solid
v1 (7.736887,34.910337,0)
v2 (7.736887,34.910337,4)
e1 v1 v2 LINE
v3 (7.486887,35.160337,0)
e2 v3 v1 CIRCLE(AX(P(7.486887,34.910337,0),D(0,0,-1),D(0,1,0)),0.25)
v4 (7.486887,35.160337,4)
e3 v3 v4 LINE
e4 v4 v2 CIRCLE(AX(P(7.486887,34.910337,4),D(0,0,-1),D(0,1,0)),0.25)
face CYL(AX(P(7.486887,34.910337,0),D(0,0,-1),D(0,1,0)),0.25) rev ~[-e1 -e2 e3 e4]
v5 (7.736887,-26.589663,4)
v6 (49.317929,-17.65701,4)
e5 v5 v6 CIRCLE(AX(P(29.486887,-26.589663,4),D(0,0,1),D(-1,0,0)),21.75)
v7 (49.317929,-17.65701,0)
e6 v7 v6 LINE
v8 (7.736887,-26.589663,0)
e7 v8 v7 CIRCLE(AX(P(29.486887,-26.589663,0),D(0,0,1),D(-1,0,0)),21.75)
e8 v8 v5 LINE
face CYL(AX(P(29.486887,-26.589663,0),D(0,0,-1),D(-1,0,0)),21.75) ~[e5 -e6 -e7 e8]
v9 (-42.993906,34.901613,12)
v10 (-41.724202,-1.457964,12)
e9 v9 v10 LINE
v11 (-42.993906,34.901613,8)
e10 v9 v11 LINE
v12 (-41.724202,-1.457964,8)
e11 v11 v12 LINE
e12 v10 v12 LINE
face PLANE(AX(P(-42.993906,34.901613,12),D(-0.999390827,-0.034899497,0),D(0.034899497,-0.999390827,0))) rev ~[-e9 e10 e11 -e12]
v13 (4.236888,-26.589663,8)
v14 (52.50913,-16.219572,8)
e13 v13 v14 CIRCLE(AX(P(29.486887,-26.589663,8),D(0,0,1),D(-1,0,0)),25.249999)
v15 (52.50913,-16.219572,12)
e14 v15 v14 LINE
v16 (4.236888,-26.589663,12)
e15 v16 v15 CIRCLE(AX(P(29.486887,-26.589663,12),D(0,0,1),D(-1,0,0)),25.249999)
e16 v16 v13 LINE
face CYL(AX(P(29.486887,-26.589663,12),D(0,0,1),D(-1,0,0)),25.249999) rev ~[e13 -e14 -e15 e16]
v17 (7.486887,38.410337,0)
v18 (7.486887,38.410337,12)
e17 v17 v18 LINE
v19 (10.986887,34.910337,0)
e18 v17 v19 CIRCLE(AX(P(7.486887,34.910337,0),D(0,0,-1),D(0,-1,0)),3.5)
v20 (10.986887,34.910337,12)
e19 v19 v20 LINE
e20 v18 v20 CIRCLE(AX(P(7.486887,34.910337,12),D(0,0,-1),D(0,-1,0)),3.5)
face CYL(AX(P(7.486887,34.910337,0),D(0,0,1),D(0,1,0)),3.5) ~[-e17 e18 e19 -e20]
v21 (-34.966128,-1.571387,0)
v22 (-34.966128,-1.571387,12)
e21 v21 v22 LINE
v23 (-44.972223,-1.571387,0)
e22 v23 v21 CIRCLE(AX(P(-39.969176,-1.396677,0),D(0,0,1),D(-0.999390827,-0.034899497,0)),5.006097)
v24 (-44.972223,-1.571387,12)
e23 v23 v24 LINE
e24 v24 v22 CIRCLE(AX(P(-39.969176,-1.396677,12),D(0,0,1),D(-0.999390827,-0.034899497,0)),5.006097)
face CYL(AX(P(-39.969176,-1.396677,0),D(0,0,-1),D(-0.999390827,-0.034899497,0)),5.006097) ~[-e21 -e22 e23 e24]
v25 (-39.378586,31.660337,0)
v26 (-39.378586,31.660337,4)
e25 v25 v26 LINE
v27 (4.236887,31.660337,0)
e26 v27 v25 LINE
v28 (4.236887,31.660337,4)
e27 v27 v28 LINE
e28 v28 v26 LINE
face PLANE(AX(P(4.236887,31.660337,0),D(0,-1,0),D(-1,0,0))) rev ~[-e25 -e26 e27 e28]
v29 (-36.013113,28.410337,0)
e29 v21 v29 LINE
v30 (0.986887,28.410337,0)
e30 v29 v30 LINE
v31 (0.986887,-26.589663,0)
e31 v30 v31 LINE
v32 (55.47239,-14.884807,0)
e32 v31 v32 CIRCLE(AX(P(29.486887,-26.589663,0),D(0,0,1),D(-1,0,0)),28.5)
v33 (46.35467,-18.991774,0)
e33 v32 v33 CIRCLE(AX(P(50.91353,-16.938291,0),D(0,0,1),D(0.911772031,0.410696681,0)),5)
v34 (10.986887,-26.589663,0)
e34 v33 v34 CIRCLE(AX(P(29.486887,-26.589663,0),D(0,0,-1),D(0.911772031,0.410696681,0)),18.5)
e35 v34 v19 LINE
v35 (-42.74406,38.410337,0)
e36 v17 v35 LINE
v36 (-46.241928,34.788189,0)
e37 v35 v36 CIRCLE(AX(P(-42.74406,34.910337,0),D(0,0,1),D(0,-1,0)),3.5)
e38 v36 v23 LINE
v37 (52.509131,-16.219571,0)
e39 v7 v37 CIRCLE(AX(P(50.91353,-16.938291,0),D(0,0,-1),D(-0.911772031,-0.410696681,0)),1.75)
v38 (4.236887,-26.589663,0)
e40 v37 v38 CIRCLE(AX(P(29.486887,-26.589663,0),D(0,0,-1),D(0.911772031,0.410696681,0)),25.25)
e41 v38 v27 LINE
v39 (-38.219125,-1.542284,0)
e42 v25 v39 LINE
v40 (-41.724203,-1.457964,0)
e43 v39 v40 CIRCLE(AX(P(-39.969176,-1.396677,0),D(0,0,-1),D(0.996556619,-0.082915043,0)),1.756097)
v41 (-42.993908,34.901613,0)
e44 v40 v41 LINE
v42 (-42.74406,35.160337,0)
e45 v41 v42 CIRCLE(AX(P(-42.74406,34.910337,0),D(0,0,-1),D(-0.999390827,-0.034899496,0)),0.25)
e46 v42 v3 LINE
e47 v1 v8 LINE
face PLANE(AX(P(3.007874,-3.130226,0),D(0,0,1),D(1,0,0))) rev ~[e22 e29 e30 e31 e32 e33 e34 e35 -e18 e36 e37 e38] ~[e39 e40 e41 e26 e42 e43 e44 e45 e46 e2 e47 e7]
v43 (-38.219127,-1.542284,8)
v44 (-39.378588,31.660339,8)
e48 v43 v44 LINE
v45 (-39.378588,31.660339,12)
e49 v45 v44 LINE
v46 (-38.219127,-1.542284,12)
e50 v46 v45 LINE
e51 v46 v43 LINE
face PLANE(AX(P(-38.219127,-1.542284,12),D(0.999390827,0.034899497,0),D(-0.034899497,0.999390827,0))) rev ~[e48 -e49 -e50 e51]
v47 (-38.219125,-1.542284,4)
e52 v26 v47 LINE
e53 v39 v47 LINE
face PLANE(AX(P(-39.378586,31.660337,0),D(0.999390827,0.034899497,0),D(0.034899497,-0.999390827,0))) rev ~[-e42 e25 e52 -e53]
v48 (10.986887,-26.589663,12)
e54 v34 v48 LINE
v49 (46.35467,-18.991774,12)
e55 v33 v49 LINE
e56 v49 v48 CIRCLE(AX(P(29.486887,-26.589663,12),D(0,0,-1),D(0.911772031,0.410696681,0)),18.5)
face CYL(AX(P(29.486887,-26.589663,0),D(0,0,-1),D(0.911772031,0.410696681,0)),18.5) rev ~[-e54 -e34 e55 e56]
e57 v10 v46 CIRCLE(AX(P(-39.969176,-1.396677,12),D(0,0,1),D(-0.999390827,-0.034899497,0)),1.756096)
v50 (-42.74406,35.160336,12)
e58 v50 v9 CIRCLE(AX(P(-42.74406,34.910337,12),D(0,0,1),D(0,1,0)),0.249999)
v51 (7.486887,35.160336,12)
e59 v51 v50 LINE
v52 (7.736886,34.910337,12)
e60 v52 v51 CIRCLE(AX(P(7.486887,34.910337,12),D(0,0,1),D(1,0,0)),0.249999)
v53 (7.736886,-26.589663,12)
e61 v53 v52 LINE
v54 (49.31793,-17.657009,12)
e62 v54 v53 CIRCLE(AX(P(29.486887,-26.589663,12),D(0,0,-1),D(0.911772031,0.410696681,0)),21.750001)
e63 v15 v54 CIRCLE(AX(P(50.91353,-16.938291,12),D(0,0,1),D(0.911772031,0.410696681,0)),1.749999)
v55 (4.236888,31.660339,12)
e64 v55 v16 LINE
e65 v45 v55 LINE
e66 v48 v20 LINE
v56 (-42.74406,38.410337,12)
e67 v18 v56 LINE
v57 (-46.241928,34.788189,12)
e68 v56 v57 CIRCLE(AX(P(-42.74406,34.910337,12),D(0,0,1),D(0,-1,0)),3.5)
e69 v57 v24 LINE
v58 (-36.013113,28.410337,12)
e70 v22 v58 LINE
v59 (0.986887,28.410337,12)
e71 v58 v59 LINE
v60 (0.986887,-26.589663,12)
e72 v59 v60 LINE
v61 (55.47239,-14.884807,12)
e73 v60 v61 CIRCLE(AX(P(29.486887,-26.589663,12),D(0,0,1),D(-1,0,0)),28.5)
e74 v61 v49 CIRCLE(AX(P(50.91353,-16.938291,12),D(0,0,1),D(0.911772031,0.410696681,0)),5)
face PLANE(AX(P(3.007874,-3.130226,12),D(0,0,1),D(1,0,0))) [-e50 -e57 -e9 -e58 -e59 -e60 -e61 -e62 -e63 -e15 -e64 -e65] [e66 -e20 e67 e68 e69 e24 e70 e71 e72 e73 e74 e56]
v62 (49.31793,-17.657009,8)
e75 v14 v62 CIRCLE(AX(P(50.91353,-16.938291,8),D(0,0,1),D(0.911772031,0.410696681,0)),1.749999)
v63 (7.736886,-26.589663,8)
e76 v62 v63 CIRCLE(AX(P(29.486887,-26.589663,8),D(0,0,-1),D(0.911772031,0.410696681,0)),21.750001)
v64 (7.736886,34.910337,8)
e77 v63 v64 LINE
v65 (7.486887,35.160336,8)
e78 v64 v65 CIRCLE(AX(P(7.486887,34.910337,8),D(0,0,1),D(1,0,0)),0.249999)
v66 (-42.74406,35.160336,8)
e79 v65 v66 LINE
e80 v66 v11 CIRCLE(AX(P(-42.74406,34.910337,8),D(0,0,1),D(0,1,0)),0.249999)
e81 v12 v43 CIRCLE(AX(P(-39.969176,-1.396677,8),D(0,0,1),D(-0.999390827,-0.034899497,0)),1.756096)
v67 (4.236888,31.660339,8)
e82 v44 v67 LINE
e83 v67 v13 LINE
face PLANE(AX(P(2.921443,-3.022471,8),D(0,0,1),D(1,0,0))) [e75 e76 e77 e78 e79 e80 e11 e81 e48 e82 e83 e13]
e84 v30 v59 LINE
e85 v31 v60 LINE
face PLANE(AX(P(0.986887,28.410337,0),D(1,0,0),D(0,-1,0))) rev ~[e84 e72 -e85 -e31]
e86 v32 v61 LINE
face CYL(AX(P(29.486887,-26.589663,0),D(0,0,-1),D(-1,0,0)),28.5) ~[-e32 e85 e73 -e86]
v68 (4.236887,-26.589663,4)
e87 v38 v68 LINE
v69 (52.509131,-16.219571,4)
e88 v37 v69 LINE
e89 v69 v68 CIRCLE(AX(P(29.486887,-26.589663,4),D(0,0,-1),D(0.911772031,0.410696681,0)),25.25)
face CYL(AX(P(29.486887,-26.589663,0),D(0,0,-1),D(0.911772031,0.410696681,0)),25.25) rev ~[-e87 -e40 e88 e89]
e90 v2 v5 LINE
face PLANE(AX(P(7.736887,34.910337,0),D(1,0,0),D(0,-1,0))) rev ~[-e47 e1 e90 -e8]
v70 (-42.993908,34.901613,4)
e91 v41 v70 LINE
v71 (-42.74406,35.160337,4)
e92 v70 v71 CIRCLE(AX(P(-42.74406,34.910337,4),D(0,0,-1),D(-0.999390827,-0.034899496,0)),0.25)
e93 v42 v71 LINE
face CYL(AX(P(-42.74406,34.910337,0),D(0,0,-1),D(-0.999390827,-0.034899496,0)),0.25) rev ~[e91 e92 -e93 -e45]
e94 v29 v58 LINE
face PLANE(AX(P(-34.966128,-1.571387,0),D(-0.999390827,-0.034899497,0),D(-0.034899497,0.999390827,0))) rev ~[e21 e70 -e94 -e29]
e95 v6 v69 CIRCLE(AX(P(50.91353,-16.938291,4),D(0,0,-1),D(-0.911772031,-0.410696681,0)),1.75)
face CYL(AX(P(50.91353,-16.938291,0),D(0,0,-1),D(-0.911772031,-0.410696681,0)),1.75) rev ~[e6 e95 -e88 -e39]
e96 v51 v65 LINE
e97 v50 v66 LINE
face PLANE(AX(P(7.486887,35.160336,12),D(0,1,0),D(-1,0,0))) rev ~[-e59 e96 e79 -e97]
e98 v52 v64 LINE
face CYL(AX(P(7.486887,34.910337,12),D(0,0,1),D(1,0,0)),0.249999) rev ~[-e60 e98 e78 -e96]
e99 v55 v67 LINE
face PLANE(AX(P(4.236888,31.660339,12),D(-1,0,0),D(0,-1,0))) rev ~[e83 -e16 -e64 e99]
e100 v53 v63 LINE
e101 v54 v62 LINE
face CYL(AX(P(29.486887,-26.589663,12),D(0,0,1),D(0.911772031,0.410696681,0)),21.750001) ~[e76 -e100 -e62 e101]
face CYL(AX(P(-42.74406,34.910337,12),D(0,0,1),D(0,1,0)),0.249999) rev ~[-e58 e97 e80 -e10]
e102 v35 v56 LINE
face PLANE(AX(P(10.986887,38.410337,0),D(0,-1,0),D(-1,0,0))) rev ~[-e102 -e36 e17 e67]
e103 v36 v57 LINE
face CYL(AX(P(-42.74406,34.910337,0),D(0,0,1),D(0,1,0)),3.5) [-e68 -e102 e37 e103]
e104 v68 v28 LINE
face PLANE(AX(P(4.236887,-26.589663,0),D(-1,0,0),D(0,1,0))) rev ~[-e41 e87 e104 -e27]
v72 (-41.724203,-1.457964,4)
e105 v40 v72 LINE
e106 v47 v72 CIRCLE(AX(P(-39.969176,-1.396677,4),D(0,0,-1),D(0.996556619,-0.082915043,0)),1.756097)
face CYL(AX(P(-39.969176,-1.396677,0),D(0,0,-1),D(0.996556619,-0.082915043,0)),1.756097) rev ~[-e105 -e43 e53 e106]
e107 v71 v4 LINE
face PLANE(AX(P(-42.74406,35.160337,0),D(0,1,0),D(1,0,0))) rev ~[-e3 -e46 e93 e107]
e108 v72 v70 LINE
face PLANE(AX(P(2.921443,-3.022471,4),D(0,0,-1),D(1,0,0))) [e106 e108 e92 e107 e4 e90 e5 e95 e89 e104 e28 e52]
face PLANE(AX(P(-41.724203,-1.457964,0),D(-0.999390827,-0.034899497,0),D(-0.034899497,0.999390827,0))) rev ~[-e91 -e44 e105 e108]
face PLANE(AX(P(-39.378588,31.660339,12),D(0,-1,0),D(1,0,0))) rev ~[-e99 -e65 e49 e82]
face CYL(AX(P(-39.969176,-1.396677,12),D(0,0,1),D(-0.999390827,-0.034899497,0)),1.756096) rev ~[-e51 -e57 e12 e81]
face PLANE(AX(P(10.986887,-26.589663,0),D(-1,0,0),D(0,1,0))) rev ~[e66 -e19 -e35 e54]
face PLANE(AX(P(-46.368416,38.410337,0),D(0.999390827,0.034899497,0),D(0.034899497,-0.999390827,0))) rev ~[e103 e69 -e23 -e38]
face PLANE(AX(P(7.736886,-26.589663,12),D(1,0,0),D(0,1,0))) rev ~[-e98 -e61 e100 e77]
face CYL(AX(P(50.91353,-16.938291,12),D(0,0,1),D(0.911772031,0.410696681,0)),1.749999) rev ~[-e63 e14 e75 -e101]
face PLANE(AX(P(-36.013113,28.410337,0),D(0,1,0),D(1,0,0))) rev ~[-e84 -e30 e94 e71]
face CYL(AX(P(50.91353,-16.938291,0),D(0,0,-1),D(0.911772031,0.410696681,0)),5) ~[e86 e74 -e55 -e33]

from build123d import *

# Parameters (mm, degrees)
F1_DEPTH = 12
F2_R     = 3.5
F4_DEPTH = 4
F6_DEPTH = 4


with BuildPart() as f1:
    # F0 (on Top) → F1 (new body)
    with BuildSketch(Plane.XY):
        with BuildLine():
            Line((10.9868871146, 38.4103373848), (-46.3684160233, 38.4103373848))
            Line((-46.3684160233, 38.4103373848), (-44.9722234273, -1.5713874258))
            ThreePointArc((-44.9722234273, -1.5713874258), (-39.9691757058, -6.4027744503), (-34.9661279843, -1.5713874258))
            Line((-34.9661279843, -1.5713874258), (-36.0131128854, 28.4103373848))
            Line((-36.0131128854, 28.4103373848), (0.9868871146, 28.4103373848))
            Line((0.9868871146, 28.4103373848), (0.9868871146, -26.5896626152))
            ThreePointArc((0.9868871146, -26.5896626152), (35.472835987, -54.4539482888), (55.4723899987, -14.8848072183))
            ThreePointArc((55.4723899987, -14.8848072183), (48.8600464406, -12.3794304662), (46.3546696885, -18.9917740242))
            ThreePointArc((46.3546696885, -18.9917740242), (33.3725030493, -44.6770059472), (10.9868871146, -26.5896626152))
            Line((10.9868871146, -26.5896626152), (10.9868871146, 38.4103373848))
        make_face()
    extrude(amount=F1_DEPTH)

    # F2
    f2_edges = [f1.edges().sort_by_distance(p)[0] for p in [
        (10.986887, 38.410337, 6),
        (-46.368416, 38.410337, 6),
    ]]
    fillet(f2_edges, radius=F2_R)

    # F3 (on face) → F4 (cut)
    with BuildSketch(Plane.XY.offset(12)):
        with BuildLine():
            Line((7.4868871146, 35.16033604), (-42.744059925, 35.16033604))
            ThreePointArc((-42.744059925, 35.16033604), (-42.9238939077, 35.0840010432), (-42.9939062878, 34.9016125575))
            Line((-42.9939062878, 34.9016125575), (-41.7242018955, -1.4579640146))
            ThreePointArc((-41.7242018955, -1.4579640146), (-40.0114090798, -3.1522651845), (-38.219126663, -1.5422839975))
            Line((-38.219126663, -1.5422839975), (-39.3785877977, 31.6603387296))
            Line((-39.3785877977, 31.6603387296), (4.2368884594, 31.6603387296))
            Line((4.2368884594, 31.6603387296), (4.2368884594, -26.5896626152))
            ThreePointArc((4.2368884594, -26.5896626152), (34.7902274998, -51.276440713), (52.5091296718, -16.2195719825))
            ThreePointArc((52.5091296718, -16.2195719825), (50.1948112049, -15.3426907931), (49.3179300155, -17.65700926))
            ThreePointArc((49.3179300155, -17.65700926), (34.0551115365, -47.854513523), (7.7368857699, -26.5896626152))
            Line((7.7368857699, -26.5896626152), (7.7368857699, 34.9103373848))
            ThreePointArc((7.7368857699, 34.9103373848), (7.663662859, 35.0871131292), (7.4868871146, 35.16033604))
        make_face()
    extrude(amount=-F4_DEPTH, mode=Mode.SUBTRACT)

    # F5 (on face) → F6 (cut)
    with BuildSketch(Plane(origin=(0, 0, 0), x_dir=(1, 0, 0), z_dir=(0, 0, -1))):
        with BuildLine():
            Line((-41.7242032033, 1.4579640602), (-42.9939075956, -34.9016125119))
            ThreePointArc((-42.9939075956, -34.9016125119), (-42.923894849, -35.0840019523), (-42.744059925, -35.1603373486))
            Line((-42.744059925, -35.1603373486), (7.4868871146, -35.1603373486))
            ThreePointArc((7.4868871146, -35.1603373486), (7.6636637843, -35.0871140545), (7.7368870784, -34.9103373848))
            Line((7.7368870784, -34.9103373848), (7.7368870784, 26.5896626152))
            ThreePointArc((7.7368870784, 26.5896626152), (34.0551112616, 47.8545122436), (49.3179288223, 17.6570097974))
            ThreePointArc((49.3179288223, 17.6570097974), (50.1948106674, 15.3426896), (52.5091308649, 16.2195714451))
            ThreePointArc((52.5091308649, 16.2195714451), (34.7902277746, 51.2764419924), (4.2368871508, 26.5896626152))
            Line((4.2368871508, 26.5896626152), (4.2368871508, -31.660337421))
            Line((4.2368871508, -31.660337421), (-39.3785864427, -31.660337421))
            Line((-39.3785864427, -31.660337421), (-38.2191253525, 1.5422840291))
            ThreePointArc((-38.2191253525, 1.5422840291), (-40.0114090726, 3.1522664936), (-41.7242032033, 1.4579640602))
        make_face()
    extrude(amount=-F6_DEPTH, mode=Mode.SUBTRACT)


solid = f1.part
